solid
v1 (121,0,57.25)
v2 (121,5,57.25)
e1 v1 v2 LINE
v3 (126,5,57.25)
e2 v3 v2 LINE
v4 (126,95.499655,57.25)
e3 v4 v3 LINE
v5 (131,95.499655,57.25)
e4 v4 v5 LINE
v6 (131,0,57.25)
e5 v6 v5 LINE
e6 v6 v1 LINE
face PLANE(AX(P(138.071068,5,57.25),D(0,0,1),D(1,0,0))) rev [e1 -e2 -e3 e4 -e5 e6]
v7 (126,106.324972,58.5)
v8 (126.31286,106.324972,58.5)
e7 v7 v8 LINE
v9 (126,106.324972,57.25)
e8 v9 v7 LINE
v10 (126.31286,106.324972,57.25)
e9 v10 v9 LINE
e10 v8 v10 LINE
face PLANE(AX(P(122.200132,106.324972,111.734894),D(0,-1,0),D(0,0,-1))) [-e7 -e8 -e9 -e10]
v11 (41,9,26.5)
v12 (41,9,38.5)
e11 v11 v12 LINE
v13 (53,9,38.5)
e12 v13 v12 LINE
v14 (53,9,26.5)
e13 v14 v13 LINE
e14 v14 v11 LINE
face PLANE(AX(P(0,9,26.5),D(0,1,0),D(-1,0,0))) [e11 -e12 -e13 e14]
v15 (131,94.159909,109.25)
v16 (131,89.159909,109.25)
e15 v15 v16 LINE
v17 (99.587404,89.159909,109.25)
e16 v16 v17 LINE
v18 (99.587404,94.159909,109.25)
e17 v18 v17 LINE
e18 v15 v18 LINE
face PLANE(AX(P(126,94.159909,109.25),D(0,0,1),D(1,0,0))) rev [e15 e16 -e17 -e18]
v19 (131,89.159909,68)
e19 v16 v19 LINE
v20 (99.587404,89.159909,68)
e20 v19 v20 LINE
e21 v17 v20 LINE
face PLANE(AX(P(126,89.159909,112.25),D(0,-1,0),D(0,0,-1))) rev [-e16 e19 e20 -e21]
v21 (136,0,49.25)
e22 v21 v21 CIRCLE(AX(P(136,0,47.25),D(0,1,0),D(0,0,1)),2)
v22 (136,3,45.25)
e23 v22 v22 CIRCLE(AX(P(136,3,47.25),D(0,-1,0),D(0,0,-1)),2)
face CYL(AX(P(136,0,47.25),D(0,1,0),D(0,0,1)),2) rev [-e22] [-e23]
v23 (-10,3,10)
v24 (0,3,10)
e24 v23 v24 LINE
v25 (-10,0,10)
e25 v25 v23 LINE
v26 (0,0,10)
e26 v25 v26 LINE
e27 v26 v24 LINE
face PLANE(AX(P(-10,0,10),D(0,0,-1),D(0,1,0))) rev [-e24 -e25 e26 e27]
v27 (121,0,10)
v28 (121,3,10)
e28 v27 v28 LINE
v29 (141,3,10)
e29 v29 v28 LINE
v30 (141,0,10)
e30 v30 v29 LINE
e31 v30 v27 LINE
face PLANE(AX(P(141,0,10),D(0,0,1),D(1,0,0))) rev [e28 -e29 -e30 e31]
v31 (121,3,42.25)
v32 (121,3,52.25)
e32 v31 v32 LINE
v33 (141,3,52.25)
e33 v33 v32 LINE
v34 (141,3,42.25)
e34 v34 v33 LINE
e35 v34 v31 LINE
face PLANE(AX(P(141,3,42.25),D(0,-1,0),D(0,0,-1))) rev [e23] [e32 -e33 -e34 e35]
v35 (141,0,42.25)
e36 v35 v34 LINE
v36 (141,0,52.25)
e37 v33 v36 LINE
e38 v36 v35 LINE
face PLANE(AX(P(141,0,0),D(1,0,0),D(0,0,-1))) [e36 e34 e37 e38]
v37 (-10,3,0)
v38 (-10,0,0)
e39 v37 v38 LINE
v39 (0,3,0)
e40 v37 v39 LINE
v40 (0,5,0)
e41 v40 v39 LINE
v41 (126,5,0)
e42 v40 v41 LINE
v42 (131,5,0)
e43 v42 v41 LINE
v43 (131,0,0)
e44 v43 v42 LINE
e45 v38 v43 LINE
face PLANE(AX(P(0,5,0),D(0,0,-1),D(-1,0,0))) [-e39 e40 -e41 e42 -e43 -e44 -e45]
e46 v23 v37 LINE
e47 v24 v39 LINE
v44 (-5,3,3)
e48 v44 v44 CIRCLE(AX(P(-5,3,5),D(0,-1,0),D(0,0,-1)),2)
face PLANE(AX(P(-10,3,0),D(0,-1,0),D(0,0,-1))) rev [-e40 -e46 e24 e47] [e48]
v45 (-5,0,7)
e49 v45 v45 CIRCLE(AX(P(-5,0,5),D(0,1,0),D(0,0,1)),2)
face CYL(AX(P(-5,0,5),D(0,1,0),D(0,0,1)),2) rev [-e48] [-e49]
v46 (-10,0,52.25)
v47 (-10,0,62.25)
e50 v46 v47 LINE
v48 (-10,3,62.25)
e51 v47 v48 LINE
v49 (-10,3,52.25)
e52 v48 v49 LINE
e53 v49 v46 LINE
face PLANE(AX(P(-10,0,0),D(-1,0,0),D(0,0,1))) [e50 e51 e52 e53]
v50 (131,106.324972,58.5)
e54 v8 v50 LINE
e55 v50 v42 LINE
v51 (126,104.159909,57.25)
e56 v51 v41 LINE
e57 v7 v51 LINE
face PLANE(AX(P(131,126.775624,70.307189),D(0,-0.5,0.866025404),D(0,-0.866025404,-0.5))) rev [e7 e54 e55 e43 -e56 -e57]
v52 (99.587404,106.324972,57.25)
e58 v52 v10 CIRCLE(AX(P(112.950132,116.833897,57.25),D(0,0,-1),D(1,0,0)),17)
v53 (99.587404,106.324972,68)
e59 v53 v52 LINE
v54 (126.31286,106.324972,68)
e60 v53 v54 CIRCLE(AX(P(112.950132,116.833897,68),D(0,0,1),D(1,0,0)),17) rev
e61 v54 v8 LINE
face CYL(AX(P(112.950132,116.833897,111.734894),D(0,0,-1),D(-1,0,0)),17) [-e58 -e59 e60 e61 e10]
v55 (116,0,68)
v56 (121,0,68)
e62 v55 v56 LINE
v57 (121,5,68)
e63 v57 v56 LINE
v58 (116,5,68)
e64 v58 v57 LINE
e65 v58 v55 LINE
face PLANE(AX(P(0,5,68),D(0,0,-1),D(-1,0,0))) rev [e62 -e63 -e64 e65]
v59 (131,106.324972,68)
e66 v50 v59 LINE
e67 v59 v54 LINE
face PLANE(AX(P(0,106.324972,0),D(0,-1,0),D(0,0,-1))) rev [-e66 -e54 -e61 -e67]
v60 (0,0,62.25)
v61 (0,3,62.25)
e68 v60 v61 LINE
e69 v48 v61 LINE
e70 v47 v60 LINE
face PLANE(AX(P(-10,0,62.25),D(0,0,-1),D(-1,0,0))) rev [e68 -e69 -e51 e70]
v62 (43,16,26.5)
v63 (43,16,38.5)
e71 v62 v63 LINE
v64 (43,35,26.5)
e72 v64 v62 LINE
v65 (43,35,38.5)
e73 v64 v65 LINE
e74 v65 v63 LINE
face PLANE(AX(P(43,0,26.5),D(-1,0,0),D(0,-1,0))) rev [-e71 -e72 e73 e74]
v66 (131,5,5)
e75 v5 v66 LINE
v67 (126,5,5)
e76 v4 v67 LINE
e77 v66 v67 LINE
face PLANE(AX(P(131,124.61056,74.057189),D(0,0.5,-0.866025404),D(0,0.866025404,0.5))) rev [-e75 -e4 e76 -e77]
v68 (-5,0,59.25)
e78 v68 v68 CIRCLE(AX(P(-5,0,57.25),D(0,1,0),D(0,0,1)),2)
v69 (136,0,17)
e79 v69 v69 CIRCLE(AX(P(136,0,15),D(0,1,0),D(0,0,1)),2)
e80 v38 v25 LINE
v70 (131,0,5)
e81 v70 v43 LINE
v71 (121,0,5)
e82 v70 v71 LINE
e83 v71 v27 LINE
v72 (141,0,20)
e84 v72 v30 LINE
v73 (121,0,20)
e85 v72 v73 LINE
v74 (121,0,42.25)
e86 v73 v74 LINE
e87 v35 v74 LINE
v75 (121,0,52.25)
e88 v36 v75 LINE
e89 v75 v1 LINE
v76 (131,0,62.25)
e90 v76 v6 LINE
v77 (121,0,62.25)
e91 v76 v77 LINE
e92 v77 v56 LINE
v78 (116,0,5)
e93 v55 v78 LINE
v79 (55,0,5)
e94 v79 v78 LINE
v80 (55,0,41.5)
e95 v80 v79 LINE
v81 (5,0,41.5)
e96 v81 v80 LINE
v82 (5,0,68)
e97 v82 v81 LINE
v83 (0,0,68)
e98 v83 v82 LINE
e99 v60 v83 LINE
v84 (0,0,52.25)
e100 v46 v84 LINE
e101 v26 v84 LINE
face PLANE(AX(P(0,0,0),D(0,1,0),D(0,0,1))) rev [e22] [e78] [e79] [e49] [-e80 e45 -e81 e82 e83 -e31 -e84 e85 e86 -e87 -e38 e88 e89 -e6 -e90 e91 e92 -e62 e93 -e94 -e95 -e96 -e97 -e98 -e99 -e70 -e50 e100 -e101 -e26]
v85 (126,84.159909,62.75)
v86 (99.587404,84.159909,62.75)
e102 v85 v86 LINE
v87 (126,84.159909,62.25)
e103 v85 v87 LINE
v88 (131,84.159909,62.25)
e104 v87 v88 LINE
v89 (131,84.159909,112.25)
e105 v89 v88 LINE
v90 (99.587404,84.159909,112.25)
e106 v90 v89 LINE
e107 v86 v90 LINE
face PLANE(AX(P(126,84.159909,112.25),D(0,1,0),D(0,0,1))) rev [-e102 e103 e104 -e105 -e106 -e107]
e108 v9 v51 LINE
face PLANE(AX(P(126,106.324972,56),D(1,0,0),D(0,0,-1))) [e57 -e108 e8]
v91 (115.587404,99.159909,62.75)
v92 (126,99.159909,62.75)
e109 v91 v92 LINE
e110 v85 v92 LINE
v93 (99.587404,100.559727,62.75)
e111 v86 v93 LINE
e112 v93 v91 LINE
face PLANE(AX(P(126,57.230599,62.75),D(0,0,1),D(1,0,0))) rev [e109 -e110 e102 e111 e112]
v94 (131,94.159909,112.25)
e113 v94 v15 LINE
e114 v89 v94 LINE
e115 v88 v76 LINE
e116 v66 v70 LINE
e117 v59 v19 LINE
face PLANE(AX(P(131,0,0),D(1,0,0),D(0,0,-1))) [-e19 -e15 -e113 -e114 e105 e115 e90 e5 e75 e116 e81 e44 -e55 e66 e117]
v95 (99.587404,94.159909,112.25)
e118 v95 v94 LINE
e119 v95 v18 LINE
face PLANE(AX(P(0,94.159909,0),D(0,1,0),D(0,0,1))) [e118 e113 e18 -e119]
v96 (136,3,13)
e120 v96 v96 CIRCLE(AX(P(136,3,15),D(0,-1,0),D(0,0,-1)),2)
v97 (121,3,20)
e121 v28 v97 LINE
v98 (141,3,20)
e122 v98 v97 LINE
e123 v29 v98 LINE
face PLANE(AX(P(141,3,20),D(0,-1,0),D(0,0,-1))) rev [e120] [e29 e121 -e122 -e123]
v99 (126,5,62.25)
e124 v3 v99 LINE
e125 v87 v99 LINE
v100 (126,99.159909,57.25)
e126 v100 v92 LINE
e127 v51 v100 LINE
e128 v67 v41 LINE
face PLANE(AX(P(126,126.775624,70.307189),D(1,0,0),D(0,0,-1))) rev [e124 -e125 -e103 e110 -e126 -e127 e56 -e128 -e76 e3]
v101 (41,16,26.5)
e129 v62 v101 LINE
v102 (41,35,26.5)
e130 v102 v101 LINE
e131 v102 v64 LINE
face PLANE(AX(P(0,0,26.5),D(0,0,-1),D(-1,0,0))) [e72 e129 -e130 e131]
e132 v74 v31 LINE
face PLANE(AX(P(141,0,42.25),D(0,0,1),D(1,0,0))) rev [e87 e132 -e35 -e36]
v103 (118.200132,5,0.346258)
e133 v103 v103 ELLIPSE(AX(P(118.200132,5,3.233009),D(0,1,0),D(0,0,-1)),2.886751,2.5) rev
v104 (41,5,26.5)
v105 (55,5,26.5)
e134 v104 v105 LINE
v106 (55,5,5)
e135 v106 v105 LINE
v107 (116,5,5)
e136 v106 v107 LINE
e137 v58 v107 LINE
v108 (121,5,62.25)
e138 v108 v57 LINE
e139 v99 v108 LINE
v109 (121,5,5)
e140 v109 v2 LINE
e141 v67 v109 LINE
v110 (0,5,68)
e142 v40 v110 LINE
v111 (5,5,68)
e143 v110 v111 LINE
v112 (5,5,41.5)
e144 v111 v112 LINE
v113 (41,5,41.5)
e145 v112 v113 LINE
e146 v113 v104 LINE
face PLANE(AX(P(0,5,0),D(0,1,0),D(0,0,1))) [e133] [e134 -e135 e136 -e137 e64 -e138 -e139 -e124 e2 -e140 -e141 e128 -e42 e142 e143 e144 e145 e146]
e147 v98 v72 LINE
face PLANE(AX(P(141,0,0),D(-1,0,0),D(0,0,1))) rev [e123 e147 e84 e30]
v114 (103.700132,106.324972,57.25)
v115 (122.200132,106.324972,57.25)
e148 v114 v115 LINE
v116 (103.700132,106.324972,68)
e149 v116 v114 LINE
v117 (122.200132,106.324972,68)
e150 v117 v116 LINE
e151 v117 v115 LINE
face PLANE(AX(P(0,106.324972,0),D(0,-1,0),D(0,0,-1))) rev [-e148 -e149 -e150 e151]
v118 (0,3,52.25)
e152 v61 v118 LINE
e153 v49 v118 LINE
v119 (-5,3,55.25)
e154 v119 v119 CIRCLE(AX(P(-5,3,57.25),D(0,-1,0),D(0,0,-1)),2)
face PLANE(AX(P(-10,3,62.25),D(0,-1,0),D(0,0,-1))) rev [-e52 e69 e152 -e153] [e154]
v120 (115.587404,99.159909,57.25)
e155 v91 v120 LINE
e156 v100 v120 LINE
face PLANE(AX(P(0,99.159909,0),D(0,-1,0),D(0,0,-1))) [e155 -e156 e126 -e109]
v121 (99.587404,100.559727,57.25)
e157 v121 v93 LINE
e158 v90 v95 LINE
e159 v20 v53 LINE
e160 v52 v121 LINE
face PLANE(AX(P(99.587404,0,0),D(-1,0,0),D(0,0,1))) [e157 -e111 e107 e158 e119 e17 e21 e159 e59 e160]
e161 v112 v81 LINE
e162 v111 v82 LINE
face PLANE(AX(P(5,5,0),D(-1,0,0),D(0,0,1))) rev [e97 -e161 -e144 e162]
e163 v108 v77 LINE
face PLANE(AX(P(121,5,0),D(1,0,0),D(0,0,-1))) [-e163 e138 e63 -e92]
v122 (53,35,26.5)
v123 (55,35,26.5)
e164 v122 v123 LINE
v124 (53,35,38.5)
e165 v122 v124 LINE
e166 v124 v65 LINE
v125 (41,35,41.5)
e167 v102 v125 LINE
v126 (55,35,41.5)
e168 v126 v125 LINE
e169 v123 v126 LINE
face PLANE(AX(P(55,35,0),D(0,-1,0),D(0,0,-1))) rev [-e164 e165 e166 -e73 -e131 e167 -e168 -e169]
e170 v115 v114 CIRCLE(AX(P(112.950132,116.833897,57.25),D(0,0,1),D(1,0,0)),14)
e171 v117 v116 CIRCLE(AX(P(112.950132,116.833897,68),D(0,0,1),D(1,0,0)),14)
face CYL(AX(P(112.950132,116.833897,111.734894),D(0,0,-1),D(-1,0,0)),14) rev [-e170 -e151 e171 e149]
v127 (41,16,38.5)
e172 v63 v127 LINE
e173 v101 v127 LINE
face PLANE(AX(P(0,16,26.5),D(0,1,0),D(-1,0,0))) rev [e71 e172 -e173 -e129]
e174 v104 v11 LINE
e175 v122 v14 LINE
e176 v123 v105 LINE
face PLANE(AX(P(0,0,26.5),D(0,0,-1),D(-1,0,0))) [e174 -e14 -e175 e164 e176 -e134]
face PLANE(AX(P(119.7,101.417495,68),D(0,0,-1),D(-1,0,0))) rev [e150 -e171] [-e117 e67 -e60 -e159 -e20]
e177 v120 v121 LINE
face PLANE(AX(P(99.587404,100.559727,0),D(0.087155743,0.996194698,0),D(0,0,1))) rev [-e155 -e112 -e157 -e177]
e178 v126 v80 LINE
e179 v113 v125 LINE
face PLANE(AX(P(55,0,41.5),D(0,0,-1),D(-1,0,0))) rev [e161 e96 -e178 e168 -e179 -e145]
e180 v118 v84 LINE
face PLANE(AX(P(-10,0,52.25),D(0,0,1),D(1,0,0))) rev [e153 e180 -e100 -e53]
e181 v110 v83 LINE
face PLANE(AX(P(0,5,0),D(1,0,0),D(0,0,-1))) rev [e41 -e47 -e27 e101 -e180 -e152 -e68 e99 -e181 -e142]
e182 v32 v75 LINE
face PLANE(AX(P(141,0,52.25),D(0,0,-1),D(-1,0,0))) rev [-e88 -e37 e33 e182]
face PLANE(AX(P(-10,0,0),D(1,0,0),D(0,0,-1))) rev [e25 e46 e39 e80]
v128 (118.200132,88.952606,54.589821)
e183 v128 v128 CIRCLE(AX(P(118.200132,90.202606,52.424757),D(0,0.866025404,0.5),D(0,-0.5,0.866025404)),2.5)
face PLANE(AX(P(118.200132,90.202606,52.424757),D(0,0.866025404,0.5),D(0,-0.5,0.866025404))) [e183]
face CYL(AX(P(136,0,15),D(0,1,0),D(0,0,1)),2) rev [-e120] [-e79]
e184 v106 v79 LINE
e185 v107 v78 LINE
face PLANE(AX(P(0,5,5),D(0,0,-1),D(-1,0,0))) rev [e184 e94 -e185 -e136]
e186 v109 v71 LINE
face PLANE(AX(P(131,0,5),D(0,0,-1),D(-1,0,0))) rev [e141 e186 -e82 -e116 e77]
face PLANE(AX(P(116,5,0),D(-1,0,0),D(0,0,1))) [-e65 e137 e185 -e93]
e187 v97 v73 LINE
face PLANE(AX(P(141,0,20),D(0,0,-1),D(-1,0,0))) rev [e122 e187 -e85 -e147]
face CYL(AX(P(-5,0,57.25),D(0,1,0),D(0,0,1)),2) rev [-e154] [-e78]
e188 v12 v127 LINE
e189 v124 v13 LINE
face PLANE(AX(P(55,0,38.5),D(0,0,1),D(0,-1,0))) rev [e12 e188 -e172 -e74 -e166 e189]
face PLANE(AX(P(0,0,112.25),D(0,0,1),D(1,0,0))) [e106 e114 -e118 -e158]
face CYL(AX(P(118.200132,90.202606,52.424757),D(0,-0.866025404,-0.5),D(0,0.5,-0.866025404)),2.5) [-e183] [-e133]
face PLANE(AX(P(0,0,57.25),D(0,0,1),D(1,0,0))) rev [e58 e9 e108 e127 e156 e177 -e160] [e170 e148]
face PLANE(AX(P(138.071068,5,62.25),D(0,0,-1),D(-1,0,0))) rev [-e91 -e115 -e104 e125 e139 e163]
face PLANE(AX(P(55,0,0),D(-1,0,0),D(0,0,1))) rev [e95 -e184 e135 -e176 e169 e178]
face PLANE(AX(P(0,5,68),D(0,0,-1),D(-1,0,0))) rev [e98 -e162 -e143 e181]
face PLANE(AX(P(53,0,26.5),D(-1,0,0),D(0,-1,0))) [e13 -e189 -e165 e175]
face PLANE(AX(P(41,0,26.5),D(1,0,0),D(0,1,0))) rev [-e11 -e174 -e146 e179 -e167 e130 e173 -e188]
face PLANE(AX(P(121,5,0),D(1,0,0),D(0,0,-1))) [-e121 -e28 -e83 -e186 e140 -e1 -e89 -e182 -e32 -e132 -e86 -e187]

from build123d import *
from OCP.BRepAlgoAPI import BRepAlgoAPI_Cut
from OCP.TopTools import TopTools_ListOfShape

# Parameters (mm, degrees)
BOSS_EXTRUDE1_DEPTH              = 5
SKETCH2_R                        = 2.5
BOSS_EXTRUDE2_DEPTH              = 100
SKETCH3_W                        = 5
SKETCH3_H                        = 5
BOSS_EXTRUDE3_DEPTH              = 10
SKETCH5_W                        = 5
SKETCH5_H                        = 4.330127019
BOSS_EXTRUDE4_DEPTH              = 117
SKETCH6_W                        = 5
SKETCH6_H                        = 5
BOSS_EXTRUDE5_DEPTH              = 20
BOSS_EXTRUDE6_DEPTH              = 15
SKETCH9_W                        = 5
SKETCH9_H                        = 5
BOSS_EXTRUDE7_DEPTH              = 10
SKETCH10_W                       = 5
SKETCH10_H                       = 5
BOSS_EXTRUDE8_DEPTH              = 99.159909
SKETCH11_W                       = 10
SKETCH11_H                       = 3
BOSS_EXTRUDE9_DEPTH              = 10
CUT_EXTRUDE1_DEPTH               = 187.084790711
CUT_EXTRUDE1_DEPTH_BACK          = 187.084790711
SKETCH13_R                       = 2
SKETCH14_W                       = 10
SKETCH14_H                       = 3
BOSS_EXTRUDE10_DEPTH             = 20
CUT_EXTRUDE2_DEPTH               = 194.255140511
CUT_EXTRUDE2_DEPTH_BACK          = 194.255140511
SKETCH15_R                       = 2
BOSS_EXTRUDE11_DEPTH             = 7.8
CUT_EXTRUDE3_DEPTH               = 187.016127587
CUT_EXTRUDE3_DEPTH_BACK          = 187.016127587
SKETCH17_W                       = 22.17902444
SKETCH17_H                       = 20
BOSS_EXTRUDE12_DEPTH             = 5.75
BOSS_EXTRUDE12_DEPTH_BACK        = 5
SKETCH19_W                       = 1.5
SKETCH19_H                       = 10.75
BOSS_EXTRUDE13_DEPTH             = 2.742414
SKETCH21_W                       = 1.5
SKETCH21_H                       = 1
BOSS_EXTRUDE15_DEPTH             = 1
BOSS_EXTRUDE17_REACH             = 195.512
CUT_EXTRUDE4_START               = 2
SKETCH23_W                       = 7.8
SKETCH23_H                       = 12
CUT_EXTRUDE4_DEPTH               = 10
BOSS_EXTRUDE19_DEPTH             = 5
BOSS_EXTRUDE19_DEPTH_BACK        = 2.165064
SKETCH23_2_W                     = 7.8
SKETCH23_2_H                     = 12
CUT_EXTRUDE5_DEPTH               = 1.25
BOSS_EXTRUDE20_REACH             = 188.016
SKETCH25_W                       = 5
SKETCH25_H                       = 4.330127019
SKETCH26_W                       = 5
SKETCH26_H                       = 2.16506351
CUT_EXTRUDE6_DEPTH               = 5
SKETCH27_W                       = 5.75
SKETCH27_H                       = 7.16506351
BOSS_EXTRUDE21_DEPTH             = 5
SKETCH29_W                       = 3
SKETCH29_H                       = 30
BOSS_EXTRUDE22_DEPTH             = 55
SKETCH30_W                       = 5
SKETCH30_H                       = 3
BOSS_EXTRUDE23_DEPTH             = 5
SKETCH31_W                       = 5
SKETCH31_H                       = 5
BOSS_EXTRUDE24_DEPTH             = 33.5
SKETCH32_W                       = 2
SKETCH32_H                       = 19
BOSS_EXTRUDE25_DEPTH             = 12
SKETCH34_W                       = 41
SKETCH34_H                       = 3
CUT_EXTRUDE7_DEPTH               = 30
SKETCH35_W                       = 14
SKETCH35_H                       = 12
BOSS_EXTRUDE26_DEPTH             = 7
BOSS_EXTRUDE27_REACH             = 187.154
SKETCH36_W                       = 9
SKETCH36_H                       = 5
BOSS_EXTRUDE27_DIRECTION_2_REACH = 187.154
SKETCH37_W                       = 41.5
SKETCH37_H                       = 5
BOSS_EXTRUDE28_DEPTH             = 41
SKETCH38_W                       = 34.251665069
SKETCH38_H                       = 27.087918127
CUT_EXTRUDE8_DEPTH               = 185.330721404
SKETCH39_W                       = 67.684653824
SKETCH39_H                       = 30.030202731
CUT_EXTRUDE9_DEPTH               = 190.235302527
SKETCH44_W                       = 5
SKETCH44_H                       = 7.16506351
BOSS_EXTRUDE30_DEPTH             = 18.612596
BOSS_EXTRUDE31_DEPTH             = 10.75
BOSS_EXTRUDE32_DEPTH             = 5.75
SKETCH46_W                       = 5
SKETCH46_H                       = 5
EDIT_THIS_LENGTH_DEPTH           = 50
SKETCH47_W                       = 5
SKETCH47_H                       = 3
BOSS_EXTRUDE34_DEPTH             = 5
BOSS_EXTRUDE35_REACH             = 207.703
SKETCH48_W                       = 26.412596329
SKETCH48_H                       = 5.25
SKETCH50_W                       = 5
SKETCH50_H                       = 5.75
BOSS_EXTRUDE36_DEPTH             = 10
BOSS_EXTRUDE37_DEPTH             = 26.412596329
CHAMFER1_SIZE                    = 16
CHAMFER1_SIZE2                   = 1.399818616


with BuildPart() as part:
    # Sketch1 → Boss-Extrude1 (new body)
    with BuildSketch(Plane(origin=(0, 0, 0), x_dir=(1, 0, 0), z_dir=(0, 1, 0))):
        Polygon((121, 0), (0, 0), (0, -68), (5, -68), (5, -5), (116, -5), (116, -68), (121, -68), align=None)
    extrude(amount=BOSS_EXTRUDE1_DEPTH)

    # Sketch2 → Boss-Extrude2 (add)
    with BuildSketch(Plane(origin=(0, 3.75, 2.165063509), x_dir=(1, 0, 0), z_dir=(0, 0.866025403784438, 0.500000000000001))):
        with Locations(Location((118.200131686, -0.299868314, 0), (0, 0, 90))):
            Circle(SKETCH2_R)
    extrude(amount=BOSS_EXTRUDE2_DEPTH)

    # Sketch3 → Boss-Extrude3 (add)
    with BuildSketch(Plane(origin=(121, 0, 0), x_dir=(0, 0, -1), z_dir=(1, 0, 0))):
        with Locations((-2.5, 2.5)):
            Rectangle(SKETCH3_W, SKETCH3_H)
    extrude(amount=BOSS_EXTRUDE3_DEPTH)

    # Sketch5 → Boss-Extrude4 (add)
    with BuildSketch(Plane(origin=(0, 3.75, 2.165063509), x_dir=(1, 0, 0), z_dir=(0, 0.866025403784438, 0.500000000000001))):
        with Locations((128.5, 0.33493649)):
            Rectangle(SKETCH5_W, SKETCH5_H)
    extrude(amount=BOSS_EXTRUDE4_DEPTH)

    # Sketch6 → Boss-Extrude5 (add)
    with BuildSketch(Plane(origin=(0, 1.25, -2.165063509), x_dir=(-1, 0, 0), z_dir=(0, 0.5000000000000009, -0.866025403784438))):
        with Locations((-128.5, 118.830127019)):
            Rectangle(SKETCH6_W, SKETCH6_H)
    extrude(amount=BOSS_EXTRUDE5_DEPTH)

    # Sketch7 → Boss-Extrude6 (add)
    with BuildSketch(Plane.ZY.offset(-126)):
        Polygon((45.509618943, 113.824972243), (41.179491924, 116.324972243), (38.679491924, 111.994845224), (43.009618943, 109.494845224), align=None)
    extrude(amount=BOSS_EXTRUDE6_DEPTH)

    # Sketch9 → Boss-Extrude7 (add)
    with BuildSketch(Plane(origin=(121, 0, 0), x_dir=(0, 0, -1), z_dir=(1, 0, 0))):
        with Locations((-59.75, 2.5)):
            Rectangle(SKETCH9_W, SKETCH9_H)
    extrude(amount=BOSS_EXTRUDE7_DEPTH)

    # Sketch10 → Boss-Extrude8 (add)
    with BuildSketch(Plane(origin=(0, 5, 0), x_dir=(1, 0, 0), z_dir=(0, 1, 0))):
        with Locations((128.5, -59.75)):
            Rectangle(SKETCH10_W, SKETCH10_H)
    extrude(amount=BOSS_EXTRUDE8_DEPTH)

    # Sketch11 → Boss-Extrude9 (add)
    with BuildSketch(Plane.ZY):
        with Locations((57.25, 1.5)):
            Rectangle(SKETCH11_W, SKETCH11_H)
        with Locations((5, 1.5)):
            Rectangle(SKETCH11_W, SKETCH11_H)
    extrude(amount=BOSS_EXTRUDE9_DEPTH)

    # Sketch13 → Cut-Extrude1 (cut, two sides: drawn at the far end of the back side and taken through both)
    with BuildSketch(Plane(origin=(0, 3, 0), x_dir=(1, 0, 0), z_dir=(0, 1, 0)).offset(-CUT_EXTRUDE1_DEPTH_BACK)):
        with Locations(Location((-5, -5, 0), (0, 0, 270))):
            Circle(SKETCH13_R)
        with Locations(Location((-5, -57.25, 0), (0, 0, 270))):
            Circle(SKETCH13_R)
    extrude(amount=CUT_EXTRUDE1_DEPTH + CUT_EXTRUDE1_DEPTH_BACK, mode=Mode.SUBTRACT)

    # Sketch14 → Boss-Extrude10 (add)
    with BuildSketch(Plane(origin=(121, 0, 0), x_dir=(0, 0, -1), z_dir=(1, 0, 0))):
        with Locations((-15, 1.5)):
            Rectangle(SKETCH14_W, SKETCH14_H)
        with Locations((-47.25, 1.5)):
            Rectangle(SKETCH14_W, SKETCH14_H)
    extrude(amount=BOSS_EXTRUDE10_DEPTH)

    # Sketch15 → Cut-Extrude2 (cut, two sides: drawn at the far end of the back side and taken through both)
    with BuildSketch(Plane(origin=(0, 3, 0), x_dir=(1, 0, 0), z_dir=(0, 1, 0)).offset(-CUT_EXTRUDE2_DEPTH_BACK)):
        with Locations(Location((136, -15, 0), (0, 0, 270))):
            Circle(SKETCH15_R)
        with Locations(Location((136, -47.25, 0), (0, 0, 270))):
            Circle(SKETCH15_R)
    extrude(amount=CUT_EXTRUDE2_DEPTH + CUT_EXTRUDE2_DEPTH_BACK, mode=Mode.SUBTRACT)

    # Sketch16 → Boss-Extrude11 (add)
    with BuildSketch(Plane.ZY.offset(-126)):
        Polygon((49.839745962, 111.324972243), (67, 101.417494955), (64.5, 97.087367936), (47.339745962, 106.994845224), align=None)
    extrude(amount=BOSS_EXTRUDE11_DEPTH)

    # Sketch17 → Cut-Extrude3 (cut, two sides: drawn at the far end of the back side and taken through both)
    with BuildSketch(Plane(origin=(0, 105.074972243, 60.665063509), x_dir=(1, 0, 0), z_dir=(0, 0.8660254037844382, 0.500000000000001)).offset(-CUT_EXTRUDE3_DEPTH_BACK)):
        with Locations((119.91048778, 12.5)):
            Rectangle(SKETCH17_W, SKETCH17_H)
    extrude(amount=CUT_EXTRUDE3_DEPTH + CUT_EXTRUDE3_DEPTH_BACK, mode=Mode.SUBTRACT)



with BuildPart() as body_2:
    # Sketch18 → Boss-Extrude12 (new, two sides: drawn at the far end of the back side and taken through both)
    with BuildSketch(Plane.XY.offset(62.25).offset(-BOSS_EXTRUDE12_DEPTH_BACK)):
        with BuildLine():
            Line((118.2, 104.159908733), (119.7, 104.159908733))
            ThreePointArc((119.7, 104.159908733), (110.2, 113.659908733), (100.7, 104.159908733))
            Line((100.7, 104.159908733), (102.2, 104.159908733))
            ThreePointArc((102.2, 104.159908733), (110.2, 112.159908733), (118.2, 104.159908733))
        make_face()
    extrude(amount=BOSS_EXTRUDE12_DEPTH + BOSS_EXTRUDE12_DEPTH_BACK)


with BuildPart() as part_1:
    add(part.part)

    add(body_2.part)  # Boss-Extrude13 merges body 2
    # Sketch19 → Boss-Extrude13 (add)
    with BuildSketch(Plane.XZ.offset(-104.159908733)):
        with Locations((118.95, 62.625)):
            Rectangle(SKETCH19_W, SKETCH19_H)
    extrude(amount=BOSS_EXTRUDE13_DEPTH)

    # Sketch21 → Boss-Extrude15 (add)
    with BuildSketch(Plane.XZ.offset(-101.417494955)):
        with Locations((118.95, 67.5)):
            Rectangle(SKETCH21_W, SKETCH21_H)
    extrude(amount=BOSS_EXTRUDE15_DEPTH)

    # Boss-Extrude17: up to this plane
    boss_extrude17_end = Plane(origin=(119.7, 101.417494955, 68), z_dir=(0, 0, -1))
    # Sketch20 → Boss-Extrude17 (add, up to the surface)
    with BuildSketch(Plane(origin=(0, -3.657477288, 6.334936491), x_dir=(1, 0, 0), z_dir=(0, -0.5000000000000039, 0.8660254037844365)), mode=Mode.PRIVATE) as boss_extrude17_sk1:
        Polygon((126, 116.330127019), (126, 121.330127019), (119.7, 121.330127019), (118.2, 121.330127019), (118.2, 116.330127019), align=None)
    boss_extrude17_tool1 = split(extrude(boss_extrude17_sk1.sketch, amount=BOSS_EXTRUDE17_REACH, mode=Mode.PRIVATE), bisect_by=boss_extrude17_end, keep=Keep.BOTH, mode=Mode.PRIVATE)
    add(boss_extrude17_tool1.solids().sort_by_distance((122.1, 99.252431, 65.75))[0])

    # Sketch23 → Cut-Extrude4 (cut)
    with BuildSketch(Plane(origin=(0, 104.159908733, 0), x_dir=(-1, 0, 0), z_dir=(0, -1, 0)).offset(CUT_EXTRUDE4_START)):
        with Locations((-122.1, -62)):
            Rectangle(SKETCH23_W, SKETCH23_H)
    extrude(amount=CUT_EXTRUDE4_DEPTH, mode=Mode.SUBTRACT)

    # Sketch23<2> → Boss-Extrude19 (add, two sides: drawn at the far end of the back side and taken through both)
    with BuildSketch(Plane(origin=(0, 104.159908733, 0), x_dir=(-1, 0, 0), z_dir=(0, -1, 0)).offset(-BOSS_EXTRUDE19_DEPTH_BACK)):
        with Locations((-122.1, -62)):
            Rectangle(SKETCH23_2_W, SKETCH23_2_H)
    extrude(amount=BOSS_EXTRUDE19_DEPTH + BOSS_EXTRUDE19_DEPTH_BACK)


with BuildPart() as cut_extrude5_tool:
    # Sketch24 → Cut-Extrude5 (new body)
    with BuildSketch(Plane(origin=(0, 0, 56), x_dir=(-1, 0, 0), z_dir=(0, 0, -1))):
        Polygon((-126, 106.324972243), (-126, 101.994845224), (-126, 99.159908733), (-118.2, 99.159908733), (-118.2, 106.324972243), align=None)
    extrude(amount=-CUT_EXTRUDE5_DEPTH)


with BuildPart() as part_2:
    add(part_1.part)

    # Cut-Extrude5: cut by cut_extrude5_tool, with a tolerance
    cut_extrude5_stock = TopTools_ListOfShape()
    cut_extrude5_stock.Append(part_2.part.wrapped)
    cut_extrude5_tools = TopTools_ListOfShape()
    cut_extrude5_tools.Append(cut_extrude5_tool.part.wrapped)
    cut_extrude5_cut = BRepAlgoAPI_Cut()
    cut_extrude5_cut.SetArguments(cut_extrude5_stock)
    cut_extrude5_cut.SetTools(cut_extrude5_tools)
    cut_extrude5_cut.SetFuzzyValue(0.00001)
    cut_extrude5_cut.Build()
    add(Compound.cast(cut_extrude5_cut.Shape()).solids(), mode=Mode.REPLACE)

    # Boss-Extrude20: up to this face of the body (flat: up to its plane)
    boss_extrude20_end = Plane(part_2.part.faces().sort_by_distance((122.724999943, 106.324972733, 62.625))[0])
    # Sketch25 → Boss-Extrude20 (add, up to the picked face)
    with BuildSketch(Plane(origin=(0, 105.074972243, 60.665063509), x_dir=(1, 0, 0), z_dir=(0, 0.8660254037844382, 0.500000000000001)), mode=Mode.PRIVATE) as boss_extrude20_sk1:
        with Locations((128.5, 0.33493649)):
            Rectangle(SKETCH25_W, SKETCH25_H)
    boss_extrude20_tool1 = split(extrude(boss_extrude20_sk1.sketch, amount=BOSS_EXTRUDE20_REACH, mode=Mode.PRIVATE), bisect_by=boss_extrude20_end, keep=Keep.BOTH, mode=Mode.PRIVATE)
    add(boss_extrude20_tool1.solids().sort_by(Axis((128.5, 105.24244, 60.375), (0, 0.8660254037844382, 0.500000000000001)))[0])


with BuildPart() as cut_extrude6_tool:
    # Sketch26 → Cut-Extrude6 (new body)
    with BuildSketch(Plane.XY.offset(62.25)):
        with Locations((128.5, 105.242440488)):
            Rectangle(SKETCH26_W, SKETCH26_H)
    extrude(amount=CUT_EXTRUDE6_DEPTH)


with BuildPart() as part_3:
    add(part_2.part)

    # Cut-Extrude6: cut by cut_extrude6_tool, with a tolerance
    cut_extrude6_stock = TopTools_ListOfShape()
    cut_extrude6_stock.Append(part_3.part.wrapped)
    cut_extrude6_tools = TopTools_ListOfShape()
    cut_extrude6_tools.Append(cut_extrude6_tool.part.wrapped)
    cut_extrude6_cut = BRepAlgoAPI_Cut()
    cut_extrude6_cut.SetArguments(cut_extrude6_stock)
    cut_extrude6_cut.SetTools(cut_extrude6_tools)
    cut_extrude6_cut.SetFuzzyValue(0.00001)
    cut_extrude6_cut.Build()
    add(Compound.cast(cut_extrude6_cut.Shape()).solids(), mode=Mode.REPLACE)

    # Sketch27 → Boss-Extrude21 (add)
    with BuildSketch(Plane(origin=(126, 0, 0), x_dir=(0, 0, -1), z_dir=(1, 0, 0))):
        with Locations((-65.125, 102.742440488)):
            Rectangle(SKETCH27_W, SKETCH27_H)
    extrude(amount=BOSS_EXTRUDE21_DEPTH)

    # Sketch29 → Boss-Extrude22 (add)
    with BuildSketch(Plane.ZY):
        with Locations((40, 20)):
            Rectangle(SKETCH29_W, SKETCH29_H)
    extrude(amount=-BOSS_EXTRUDE22_DEPTH)

    # Sketch30 → Boss-Extrude23 (add)
    with BuildSketch(Plane.XZ.offset(-5)):
        with Locations((52.5, 40)):
            Rectangle(SKETCH30_W, SKETCH30_H)
    extrude(amount=BOSS_EXTRUDE23_DEPTH)

    # Sketch31 → Boss-Extrude24 (add)
    with BuildSketch(Plane(origin=(0, 0, 38.5), x_dir=(-1, 0, 0), z_dir=(0, 0, -1))):
        with Locations((-52.5, 2.5)):
            Rectangle(SKETCH31_W, SKETCH31_H)
    extrude(amount=BOSS_EXTRUDE24_DEPTH)

    # Sketch32 → Boss-Extrude25 (add)
    with BuildSketch(Plane(origin=(0, 0, 38.5), x_dir=(-1, 0, 0), z_dir=(0, 0, -1))):
        Polygon((-41, 9), (-53, 9), (-53, 35), (-55, 35), (-55, 7), (-41, 7), align=None)
        with Locations((-42, 25.5)):
            Rectangle(SKETCH32_W, SKETCH32_H)
    extrude(amount=BOSS_EXTRUDE25_DEPTH)

    # Sketch34 → Cut-Extrude7 (cut)
    with BuildSketch(Plane(origin=(0, 35, 0), x_dir=(1, 0, 0), z_dir=(0, 1, 0))):
        with Locations((20.5, -40)):
            Rectangle(SKETCH34_W, SKETCH34_H)
    extrude(amount=-CUT_EXTRUDE7_DEPTH, mode=Mode.SUBTRACT)

    # Sketch35 → Boss-Extrude26 (add)
    with BuildSketch(Plane.XZ.offset(-7)):
        with Locations((48, 32.5)):
            Rectangle(SKETCH35_W, SKETCH35_H)
    extrude(amount=BOSS_EXTRUDE26_DEPTH)

    # Boss-Extrude27: up to this face of the body (flat: up to its plane)
    boss_extrude27_end = Plane(part_3.part.faces().sort_by_distance((48.252808989, 19.016853933, 41.5))[0])
    # Sketch36 → Boss-Extrude27 (add, up to the picked face)
    with BuildSketch(Plane.XY.offset(38.5), mode=Mode.PRIVATE) as boss_extrude27_sk1:
        with Locations((45.5, 2.5)):
            Rectangle(SKETCH36_W, SKETCH36_H)
    boss_extrude27_tool1 = split(extrude(boss_extrude27_sk1.sketch, amount=BOSS_EXTRUDE27_REACH, mode=Mode.PRIVATE), bisect_by=boss_extrude27_end, keep=Keep.BOTH, mode=Mode.PRIVATE)
    add(boss_extrude27_tool1.solids().sort_by(Axis((45.5, 2.5, 38.5), (0, 0, 1)))[0])

    # Boss-Extrude27 direction 2: up to this face of the body (flat: up to its plane)
    boss_extrude27_direction_2_end = Plane(part_3.part.faces().sort_by_distance((27.5, 2.5, 5))[0])
    # Sketch36 → Boss-Extrude27 direction 2 (add, up to the picked face)
    with BuildSketch(Plane.XY.offset(38.5), mode=Mode.PRIVATE) as boss_extrude27_direction_2_sk1:
        with Locations((45.5, 2.5)):
            Rectangle(SKETCH36_W, SKETCH36_H)
    boss_extrude27_direction_2_tool1 = split(extrude(boss_extrude27_direction_2_sk1.sketch, amount=-BOSS_EXTRUDE27_DIRECTION_2_REACH, mode=Mode.PRIVATE), bisect_by=boss_extrude27_direction_2_end, keep=Keep.BOTH, mode=Mode.PRIVATE)
    add(boss_extrude27_direction_2_tool1.solids().sort_by(Axis((45.5, 2.5, 38.5), (0, 0, -1)))[0])

    # Sketch37 → Boss-Extrude28 (add)
    with BuildSketch(Plane.ZY.offset(-41)):
        with Locations((20.75, 2.5)):
            Rectangle(SKETCH37_W, SKETCH37_H)
    extrude(amount=BOSS_EXTRUDE28_DEPTH)

    # Sketch38 → Cut-Extrude8 (cut, through all)
    with BuildSketch(Plane.ZY.offset(-118.2)):
        with Locations((61.183105348, 109.662346151)):
            Rectangle(SKETCH38_W, SKETCH38_H)
    extrude(amount=CUT_EXTRUDE8_DEPTH, mode=Mode.SUBTRACT)

    # Sketch39 → Cut-Extrude9 (cut, through all)
    with BuildSketch(Plane(origin=(0, 106.324972243, 0), x_dir=(1, 0, 0), z_dir=(0, 1, 0))):
        with Locations((120.498501698, -57.225220953)):
            Rectangle(SKETCH39_W, SKETCH39_H)
    extrude(amount=CUT_EXTRUDE9_DEPTH, mode=Mode.SUBTRACT)

    # Sketch44 → Boss-Extrude30 (add)
    with BuildSketch(Plane.ZY.offset(-118.2)):
        with Locations((59.75, 102.742440488)):
            Rectangle(SKETCH44_W, SKETCH44_H)
    extrude(amount=BOSS_EXTRUDE30_DEPTH)

    # Sketch43 → Boss-Extrude31 (add)
    with BuildSketch(Plane(origin=(0, 0, 57.25), x_dir=(-1, 0, 0), z_dir=(0, 0, -1))):
        with BuildLine():
            Line((-122.200131686, 106.324972243), (-126, 106.324972243))
            Line((-126, 106.324972243), (-126.312859701, 106.324972243))
            ThreePointArc((-126.312859701, 106.324972243), (-112.950131686, 133.833897021), (-99.587403671, 106.324972243))
            Line((-99.587403671, 106.324972243), (-103.700131686, 106.324972243))
            ThreePointArc((-103.700131686, 106.324972243), (-112.950131686, 130.833897021), (-122.200131686, 106.324972243))
        make_face()
    extrude(amount=-BOSS_EXTRUDE31_DEPTH)

    # Sketch45 → Boss-Extrude32 (add)
    with BuildSketch(Plane.XY.offset(62.25)):
        Polygon((118.2, 99.159908733), (118.2, 106.324972243), (103.700131686, 106.324972243), (99.587403671, 106.324972243), (99.587403671, 99.159908733), align=None)
    extrude(amount=BOSS_EXTRUDE32_DEPTH)

    # Sketch46 → EDIT THIS LENGTH (add)
    with BuildSketch(Plane.XY.offset(62.25)):
        with Locations((128.5, 86.659908733)):
            Rectangle(SKETCH46_W, SKETCH46_H)
    extrude(amount=EDIT_THIS_LENGTH_DEPTH)

    # Sketch47 → Boss-Extrude34 (add)
    with BuildSketch(Plane(origin=(0, 89.159908733, 0), x_dir=(1, 0, 0), z_dir=(0, 1, 0))):
        with Locations((128.5, -110.75)):
            Rectangle(SKETCH47_W, SKETCH47_H)
    extrude(amount=BOSS_EXTRUDE34_DEPTH)

    # Boss-Extrude35: up to this face of the body (flat: up to its plane)
    boss_extrude35_end = Plane(part_3.part.faces().sort_by_distance((128.5, 84.159908733, 87.25))[0])
    # Sketch48 → Boss-Extrude35 (add, up to the picked face)
    with BuildSketch(Plane.XZ.offset(-99.159908733), mode=Mode.PRIVATE) as boss_extrude35_sk1:
        with Locations((112.793701836, 65.375)):
            Rectangle(SKETCH48_W, SKETCH48_H)
    boss_extrude35_tool1 = split(extrude(boss_extrude35_sk1.sketch, amount=BOSS_EXTRUDE35_REACH, mode=Mode.PRIVATE), bisect_by=boss_extrude35_end, keep=Keep.BOTH, mode=Mode.PRIVATE)
    add(boss_extrude35_tool1.solids().sort_by(Axis((112.793702, 99.159909, 65.375), (0, -1, 0)))[0])

    # Sketch50 → Boss-Extrude36 (add)
    with BuildSketch(Plane.XZ.offset(-99.159908733)):
        with Locations((128.5, 65.125)):
            Rectangle(SKETCH50_W, SKETCH50_H)
    extrude(amount=BOSS_EXTRUDE36_DEPTH)

    # Sketch51 → Boss-Extrude37 (add)
    with BuildSketch(Plane.ZY.offset(-126)):
        Polygon((68, 89.159908733), (68, 84.159908733), (112.25, 84.159908733), (112.25, 94.159908733), (109.25, 94.159908733), (109.25, 89.159908733), align=None)
    extrude(amount=BOSS_EXTRUDE37_DEPTH)

    # Chamfer1
    chamfer1_edges = [part_3.edges().sort_by_distance(p)[0] for p in [
        (99.587404, 99.159908733, 59.75),
    ]]
    chamfer1_side = [part_3.faces().sort_by_distance(p)[0] for p in [
        (112.793702, 99.159908733, 60),
    ]]
    chamfer(chamfer1_edges, length=CHAMFER1_SIZE, length2=CHAMFER1_SIZE2, reference=chamfer1_side[0])


solid = part_3.part
